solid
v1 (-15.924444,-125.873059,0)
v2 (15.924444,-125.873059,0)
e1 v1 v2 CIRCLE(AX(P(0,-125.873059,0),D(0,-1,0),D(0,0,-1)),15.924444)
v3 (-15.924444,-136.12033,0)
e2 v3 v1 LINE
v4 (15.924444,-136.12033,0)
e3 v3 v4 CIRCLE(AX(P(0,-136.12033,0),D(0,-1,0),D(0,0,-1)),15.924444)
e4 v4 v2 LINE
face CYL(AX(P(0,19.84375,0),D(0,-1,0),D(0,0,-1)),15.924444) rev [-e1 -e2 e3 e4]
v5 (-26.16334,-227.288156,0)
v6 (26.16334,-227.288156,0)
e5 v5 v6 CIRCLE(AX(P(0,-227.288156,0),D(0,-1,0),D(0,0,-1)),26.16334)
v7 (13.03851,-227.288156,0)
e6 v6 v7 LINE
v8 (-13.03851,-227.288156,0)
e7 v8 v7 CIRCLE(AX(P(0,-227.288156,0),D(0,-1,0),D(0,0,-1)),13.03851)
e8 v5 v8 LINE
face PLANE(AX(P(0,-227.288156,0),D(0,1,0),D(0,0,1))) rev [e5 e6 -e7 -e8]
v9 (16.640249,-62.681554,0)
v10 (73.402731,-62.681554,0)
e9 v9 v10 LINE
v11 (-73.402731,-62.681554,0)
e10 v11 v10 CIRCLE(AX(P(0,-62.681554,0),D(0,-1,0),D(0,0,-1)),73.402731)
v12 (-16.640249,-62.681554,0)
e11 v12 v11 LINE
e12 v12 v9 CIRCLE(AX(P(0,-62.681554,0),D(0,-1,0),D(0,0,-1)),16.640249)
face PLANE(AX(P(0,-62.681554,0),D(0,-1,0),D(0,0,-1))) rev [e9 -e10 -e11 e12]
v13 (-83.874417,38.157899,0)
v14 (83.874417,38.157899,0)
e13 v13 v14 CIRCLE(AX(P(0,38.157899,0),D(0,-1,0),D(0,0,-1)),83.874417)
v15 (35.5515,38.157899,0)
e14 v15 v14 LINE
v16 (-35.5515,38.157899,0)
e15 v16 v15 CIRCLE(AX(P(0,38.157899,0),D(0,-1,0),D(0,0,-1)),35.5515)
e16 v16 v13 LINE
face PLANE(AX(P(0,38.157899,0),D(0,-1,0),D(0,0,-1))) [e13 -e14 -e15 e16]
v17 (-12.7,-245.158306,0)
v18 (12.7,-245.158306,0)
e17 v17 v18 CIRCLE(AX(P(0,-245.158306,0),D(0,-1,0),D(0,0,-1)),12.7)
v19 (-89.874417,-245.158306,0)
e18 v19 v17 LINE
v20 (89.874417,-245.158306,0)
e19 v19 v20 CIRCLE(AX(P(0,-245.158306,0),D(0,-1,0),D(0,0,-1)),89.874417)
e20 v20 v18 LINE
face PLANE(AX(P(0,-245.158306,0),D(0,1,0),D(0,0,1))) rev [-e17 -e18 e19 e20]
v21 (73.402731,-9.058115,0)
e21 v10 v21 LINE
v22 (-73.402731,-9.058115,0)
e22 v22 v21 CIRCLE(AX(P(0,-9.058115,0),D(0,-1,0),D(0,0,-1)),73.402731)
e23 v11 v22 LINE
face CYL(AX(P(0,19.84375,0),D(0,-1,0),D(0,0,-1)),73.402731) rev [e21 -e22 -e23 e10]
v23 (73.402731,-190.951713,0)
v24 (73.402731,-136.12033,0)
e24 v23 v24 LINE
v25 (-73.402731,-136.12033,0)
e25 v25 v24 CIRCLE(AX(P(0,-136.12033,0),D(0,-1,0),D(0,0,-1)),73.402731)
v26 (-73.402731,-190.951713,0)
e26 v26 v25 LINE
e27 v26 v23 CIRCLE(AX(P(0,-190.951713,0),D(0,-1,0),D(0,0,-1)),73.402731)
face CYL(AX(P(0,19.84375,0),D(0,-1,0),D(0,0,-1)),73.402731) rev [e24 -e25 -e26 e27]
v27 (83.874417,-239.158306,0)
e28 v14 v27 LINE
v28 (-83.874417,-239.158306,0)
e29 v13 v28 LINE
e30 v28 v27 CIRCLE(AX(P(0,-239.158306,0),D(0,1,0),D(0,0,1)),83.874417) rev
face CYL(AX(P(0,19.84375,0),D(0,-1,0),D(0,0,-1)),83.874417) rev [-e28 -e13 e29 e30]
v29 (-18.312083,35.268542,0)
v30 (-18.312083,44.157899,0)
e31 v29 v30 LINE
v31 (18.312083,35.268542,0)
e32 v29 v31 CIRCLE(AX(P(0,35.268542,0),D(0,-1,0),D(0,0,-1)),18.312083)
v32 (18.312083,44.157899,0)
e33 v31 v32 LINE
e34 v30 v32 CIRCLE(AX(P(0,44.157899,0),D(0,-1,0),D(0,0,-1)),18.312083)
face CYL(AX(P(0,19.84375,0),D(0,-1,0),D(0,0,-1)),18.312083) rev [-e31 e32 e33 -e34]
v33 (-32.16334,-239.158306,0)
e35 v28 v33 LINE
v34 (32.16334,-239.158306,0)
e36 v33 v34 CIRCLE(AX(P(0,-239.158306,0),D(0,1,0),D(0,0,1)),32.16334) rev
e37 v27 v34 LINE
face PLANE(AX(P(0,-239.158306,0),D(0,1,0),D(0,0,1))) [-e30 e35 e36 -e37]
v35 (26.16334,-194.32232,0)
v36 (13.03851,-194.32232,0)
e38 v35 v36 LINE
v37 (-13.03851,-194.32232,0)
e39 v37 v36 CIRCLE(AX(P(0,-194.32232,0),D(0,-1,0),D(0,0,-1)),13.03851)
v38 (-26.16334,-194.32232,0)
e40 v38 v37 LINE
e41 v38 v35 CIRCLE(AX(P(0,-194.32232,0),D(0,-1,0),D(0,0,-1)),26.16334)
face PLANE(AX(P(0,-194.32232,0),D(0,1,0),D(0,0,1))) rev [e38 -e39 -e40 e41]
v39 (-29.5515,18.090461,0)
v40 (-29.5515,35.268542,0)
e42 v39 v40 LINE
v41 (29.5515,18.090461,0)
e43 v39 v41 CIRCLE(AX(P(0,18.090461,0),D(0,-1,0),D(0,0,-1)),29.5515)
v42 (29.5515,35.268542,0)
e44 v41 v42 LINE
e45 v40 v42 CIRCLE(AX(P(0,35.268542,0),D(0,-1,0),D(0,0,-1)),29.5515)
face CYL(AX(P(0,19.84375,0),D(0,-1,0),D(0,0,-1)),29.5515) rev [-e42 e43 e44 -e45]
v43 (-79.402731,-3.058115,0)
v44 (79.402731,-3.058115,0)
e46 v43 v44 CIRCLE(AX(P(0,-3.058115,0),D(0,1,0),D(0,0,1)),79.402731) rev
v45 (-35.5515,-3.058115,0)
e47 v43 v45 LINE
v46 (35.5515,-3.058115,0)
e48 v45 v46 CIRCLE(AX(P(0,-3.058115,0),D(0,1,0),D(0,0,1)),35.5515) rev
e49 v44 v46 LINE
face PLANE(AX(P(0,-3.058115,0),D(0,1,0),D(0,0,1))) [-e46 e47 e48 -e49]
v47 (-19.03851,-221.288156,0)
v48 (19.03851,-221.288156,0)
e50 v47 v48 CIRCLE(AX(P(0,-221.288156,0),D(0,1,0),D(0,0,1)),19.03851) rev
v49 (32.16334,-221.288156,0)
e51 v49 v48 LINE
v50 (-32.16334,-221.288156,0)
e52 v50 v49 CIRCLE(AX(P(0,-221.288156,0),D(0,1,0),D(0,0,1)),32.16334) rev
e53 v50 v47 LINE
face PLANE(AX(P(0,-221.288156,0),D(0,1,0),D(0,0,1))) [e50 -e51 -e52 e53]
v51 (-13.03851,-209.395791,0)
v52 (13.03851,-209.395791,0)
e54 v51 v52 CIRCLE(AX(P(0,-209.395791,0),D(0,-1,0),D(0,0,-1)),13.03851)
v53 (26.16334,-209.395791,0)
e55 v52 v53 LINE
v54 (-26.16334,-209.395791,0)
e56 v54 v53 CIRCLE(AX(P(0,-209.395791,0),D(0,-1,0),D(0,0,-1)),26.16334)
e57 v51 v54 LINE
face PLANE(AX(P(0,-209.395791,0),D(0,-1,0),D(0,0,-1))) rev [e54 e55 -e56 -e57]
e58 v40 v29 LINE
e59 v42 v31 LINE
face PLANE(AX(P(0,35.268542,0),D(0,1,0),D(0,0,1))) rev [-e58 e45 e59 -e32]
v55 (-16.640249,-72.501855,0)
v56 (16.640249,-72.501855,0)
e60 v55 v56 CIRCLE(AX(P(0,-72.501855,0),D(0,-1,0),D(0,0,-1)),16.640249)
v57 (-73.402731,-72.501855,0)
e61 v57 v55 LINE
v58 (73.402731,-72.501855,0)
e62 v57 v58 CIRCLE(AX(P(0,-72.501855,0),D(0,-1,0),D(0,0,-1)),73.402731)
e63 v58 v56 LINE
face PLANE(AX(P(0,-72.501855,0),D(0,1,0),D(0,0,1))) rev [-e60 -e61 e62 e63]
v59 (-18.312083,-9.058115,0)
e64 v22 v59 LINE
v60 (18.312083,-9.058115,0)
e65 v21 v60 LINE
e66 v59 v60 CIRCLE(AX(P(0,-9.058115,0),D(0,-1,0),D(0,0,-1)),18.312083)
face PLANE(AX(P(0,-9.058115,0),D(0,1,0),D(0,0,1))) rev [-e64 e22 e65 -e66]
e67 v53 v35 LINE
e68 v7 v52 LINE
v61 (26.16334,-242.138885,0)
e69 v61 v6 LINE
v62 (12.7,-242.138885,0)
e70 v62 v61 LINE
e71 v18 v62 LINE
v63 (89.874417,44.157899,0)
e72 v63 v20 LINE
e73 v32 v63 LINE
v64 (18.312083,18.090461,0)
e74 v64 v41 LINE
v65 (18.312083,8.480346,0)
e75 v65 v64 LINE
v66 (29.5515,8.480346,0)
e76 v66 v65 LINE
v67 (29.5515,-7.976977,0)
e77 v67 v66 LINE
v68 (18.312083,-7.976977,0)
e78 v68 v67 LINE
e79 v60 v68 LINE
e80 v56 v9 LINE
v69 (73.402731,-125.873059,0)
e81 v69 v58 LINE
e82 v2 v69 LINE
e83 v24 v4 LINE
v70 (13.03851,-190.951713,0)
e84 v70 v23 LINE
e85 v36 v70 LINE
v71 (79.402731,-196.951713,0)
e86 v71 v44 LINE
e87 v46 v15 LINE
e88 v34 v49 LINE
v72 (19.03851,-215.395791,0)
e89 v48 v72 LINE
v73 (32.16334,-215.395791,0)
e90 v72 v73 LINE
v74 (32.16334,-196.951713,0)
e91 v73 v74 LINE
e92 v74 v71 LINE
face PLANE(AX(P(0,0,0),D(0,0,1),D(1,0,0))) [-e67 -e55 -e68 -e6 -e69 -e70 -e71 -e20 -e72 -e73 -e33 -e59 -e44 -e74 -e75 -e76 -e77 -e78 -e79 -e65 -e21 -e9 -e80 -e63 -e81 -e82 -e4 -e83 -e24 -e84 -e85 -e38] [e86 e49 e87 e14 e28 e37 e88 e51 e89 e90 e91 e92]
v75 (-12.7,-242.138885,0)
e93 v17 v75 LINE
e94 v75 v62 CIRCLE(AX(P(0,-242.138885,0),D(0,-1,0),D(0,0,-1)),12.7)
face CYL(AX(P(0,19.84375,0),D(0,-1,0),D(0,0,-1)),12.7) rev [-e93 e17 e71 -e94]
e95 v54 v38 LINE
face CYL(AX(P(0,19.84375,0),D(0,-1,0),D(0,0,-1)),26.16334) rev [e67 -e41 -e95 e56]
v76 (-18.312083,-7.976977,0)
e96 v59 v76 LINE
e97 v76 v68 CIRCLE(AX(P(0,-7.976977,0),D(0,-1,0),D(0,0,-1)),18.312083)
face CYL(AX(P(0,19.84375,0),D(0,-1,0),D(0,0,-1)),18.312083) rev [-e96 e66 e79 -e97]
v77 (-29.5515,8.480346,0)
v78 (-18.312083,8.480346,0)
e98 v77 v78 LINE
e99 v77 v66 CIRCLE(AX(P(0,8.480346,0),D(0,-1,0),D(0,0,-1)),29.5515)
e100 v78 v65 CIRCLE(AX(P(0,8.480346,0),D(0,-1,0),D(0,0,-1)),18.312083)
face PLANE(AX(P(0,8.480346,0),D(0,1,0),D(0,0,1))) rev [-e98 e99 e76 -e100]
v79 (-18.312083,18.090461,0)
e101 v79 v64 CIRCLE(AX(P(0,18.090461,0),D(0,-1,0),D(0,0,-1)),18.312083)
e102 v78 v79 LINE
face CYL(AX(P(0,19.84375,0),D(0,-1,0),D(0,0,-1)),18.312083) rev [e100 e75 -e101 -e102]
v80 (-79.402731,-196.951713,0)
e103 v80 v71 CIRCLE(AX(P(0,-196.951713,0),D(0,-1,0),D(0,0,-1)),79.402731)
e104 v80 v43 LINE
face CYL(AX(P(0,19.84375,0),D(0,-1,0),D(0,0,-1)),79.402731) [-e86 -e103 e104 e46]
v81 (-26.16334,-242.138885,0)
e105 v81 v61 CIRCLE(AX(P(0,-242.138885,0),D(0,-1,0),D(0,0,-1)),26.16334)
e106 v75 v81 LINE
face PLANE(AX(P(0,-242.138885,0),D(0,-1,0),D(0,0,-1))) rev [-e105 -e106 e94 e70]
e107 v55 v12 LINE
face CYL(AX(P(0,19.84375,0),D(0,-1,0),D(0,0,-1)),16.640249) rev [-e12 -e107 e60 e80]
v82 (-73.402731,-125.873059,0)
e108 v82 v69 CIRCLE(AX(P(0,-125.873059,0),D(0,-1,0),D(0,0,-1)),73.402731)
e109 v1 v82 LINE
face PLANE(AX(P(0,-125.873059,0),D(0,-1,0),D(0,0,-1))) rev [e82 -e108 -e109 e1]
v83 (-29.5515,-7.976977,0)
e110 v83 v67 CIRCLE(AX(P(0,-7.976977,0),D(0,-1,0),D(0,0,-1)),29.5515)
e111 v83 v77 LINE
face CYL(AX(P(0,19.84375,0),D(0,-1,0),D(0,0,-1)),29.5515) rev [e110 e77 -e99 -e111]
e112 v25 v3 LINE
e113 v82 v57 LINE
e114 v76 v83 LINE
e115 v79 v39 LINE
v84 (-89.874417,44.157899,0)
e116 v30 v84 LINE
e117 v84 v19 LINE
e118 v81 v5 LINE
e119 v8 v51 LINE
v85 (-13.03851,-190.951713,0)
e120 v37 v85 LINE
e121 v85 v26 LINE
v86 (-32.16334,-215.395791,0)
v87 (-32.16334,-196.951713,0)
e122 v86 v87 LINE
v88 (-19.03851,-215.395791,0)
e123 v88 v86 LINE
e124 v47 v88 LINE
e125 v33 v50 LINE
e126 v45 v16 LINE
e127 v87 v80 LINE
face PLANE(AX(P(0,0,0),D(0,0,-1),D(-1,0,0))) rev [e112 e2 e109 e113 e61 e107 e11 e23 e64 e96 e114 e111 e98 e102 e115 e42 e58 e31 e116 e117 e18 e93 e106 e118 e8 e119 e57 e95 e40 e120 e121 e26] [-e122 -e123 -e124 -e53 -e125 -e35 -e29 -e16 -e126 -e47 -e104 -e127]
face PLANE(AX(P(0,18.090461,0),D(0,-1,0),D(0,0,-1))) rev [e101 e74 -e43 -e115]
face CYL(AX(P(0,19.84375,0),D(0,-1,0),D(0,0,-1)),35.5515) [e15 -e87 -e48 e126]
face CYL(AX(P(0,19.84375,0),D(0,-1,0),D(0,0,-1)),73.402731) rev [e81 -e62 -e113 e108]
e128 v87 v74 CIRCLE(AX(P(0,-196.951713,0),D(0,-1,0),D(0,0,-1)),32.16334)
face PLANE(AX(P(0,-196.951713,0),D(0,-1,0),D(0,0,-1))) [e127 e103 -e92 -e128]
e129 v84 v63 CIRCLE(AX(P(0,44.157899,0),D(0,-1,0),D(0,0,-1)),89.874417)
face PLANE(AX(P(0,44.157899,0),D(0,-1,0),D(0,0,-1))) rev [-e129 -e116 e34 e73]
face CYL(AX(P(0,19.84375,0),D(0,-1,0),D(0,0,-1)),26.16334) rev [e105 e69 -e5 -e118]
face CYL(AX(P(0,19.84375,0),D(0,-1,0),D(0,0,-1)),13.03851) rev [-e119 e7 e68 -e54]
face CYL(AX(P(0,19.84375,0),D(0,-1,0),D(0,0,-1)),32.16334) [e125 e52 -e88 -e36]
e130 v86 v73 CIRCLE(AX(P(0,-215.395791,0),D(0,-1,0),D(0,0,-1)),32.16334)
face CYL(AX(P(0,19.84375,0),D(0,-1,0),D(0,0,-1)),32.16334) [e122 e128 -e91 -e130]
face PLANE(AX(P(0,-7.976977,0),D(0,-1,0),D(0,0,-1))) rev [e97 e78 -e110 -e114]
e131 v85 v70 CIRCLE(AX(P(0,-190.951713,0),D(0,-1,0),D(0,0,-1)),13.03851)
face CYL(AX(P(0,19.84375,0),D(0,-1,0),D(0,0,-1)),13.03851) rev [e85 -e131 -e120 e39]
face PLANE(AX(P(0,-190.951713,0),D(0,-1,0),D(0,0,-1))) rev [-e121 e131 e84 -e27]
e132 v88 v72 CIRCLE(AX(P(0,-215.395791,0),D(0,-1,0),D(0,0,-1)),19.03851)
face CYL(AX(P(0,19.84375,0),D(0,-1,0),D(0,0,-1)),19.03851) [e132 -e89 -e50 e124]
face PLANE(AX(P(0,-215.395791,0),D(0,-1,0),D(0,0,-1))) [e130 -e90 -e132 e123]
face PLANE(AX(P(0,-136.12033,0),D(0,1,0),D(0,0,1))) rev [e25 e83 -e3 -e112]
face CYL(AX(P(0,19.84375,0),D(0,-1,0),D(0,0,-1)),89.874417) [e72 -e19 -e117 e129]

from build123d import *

# Parameters (mm, degrees)
REVOLVE1_ANGLE = 180
SHELL1_START   = -239.158306138
SHELL1_DEPTH   = 42.206593174
SHELL1_START_2 = -3.058115052
SHELL1_2_DEPTH = 41.216014124
SHELL1_START_3 = -196.951712964
SHELL1_3_DEPTH = 193.893597912
SHELL1_START_4 = -221.288155922
SHELL1_4_DEPTH = 5.892364499


# Read off the part's stored shape, not the designer's step: Shell1
with BuildPart() as part:
    # Sketch1 → Revolve1 (revolve)
    with BuildSketch(Plane.XY):
        Polygon((89.874416534, -245.158306138), (12.7, -245.158306138), (12.7, -242.138884915), (26.163339875, -242.138884915), (26.163339875, -227.288155922), (13.03850974, -227.288155922), (13.03850974, -209.395791423), (26.163339875, -209.395791423), (26.163339875, -194.322320246), (13.03850974, -194.322320246), (13.03850974, -190.951712964), (73.402730944, -190.951712964), (73.402730944, -136.120329582), (15.924443856, -136.120329582), (15.924443856, -125.873058549), (73.402730944, -125.873058549), (73.402730944, -72.501855253), (16.640249143, -72.501855253), (16.640249143, -62.681553847), (73.402730944, -62.681553847), (73.402730944, -9.058115052), (18.31208302, -9.058115052), (18.31208302, -7.976977068), (29.551500324, -7.976977068), (29.551500324, 8.480345585), (18.31208302, 8.480345585), (18.31208302, 18.090461002), (29.551500324, 18.090461002), (29.551500324, 35.26854231), (18.31208302, 35.26854231), (18.31208302, 44.157899072), (89.874416534, 44.157899072), align=None)
    revolve(axis=Axis((0, 19.84375, 0), (0, 1, 0)), revolution_arc=REVOLVE1_ANGLE)

    # Shell1 outline → Shell1 (cut)
    with BuildSketch(Plane(origin=(0, 0, 0), x_dir=(1, 0, 0), z_dir=(0, 1, 0)).offset(SHELL1_START)):
        with BuildLine():
            ThreePointArc((83.874416534, 0), (0, 83.874416534), (-83.874416534, 0))
            Line((-83.874416534, 0), (-32.163339875, 0))
            ThreePointArc((-32.163339875, 0), (0, 32.163339875), (32.163339875, 0))
            Line((32.163339875, 0), (83.874416534, 0))
        make_face()
    extrude(amount=SHELL1_DEPTH, mode=Mode.SUBTRACT)

    # Shell1 2 outline → Shell1 2 (cut)
    with BuildSketch(Plane(origin=(0, 0, 0), x_dir=(1, 0, 0), z_dir=(0, 1, 0)).offset(SHELL1_START_2)):
        with BuildLine():
            ThreePointArc((83.874416534, 0), (0, 83.874416534), (-83.874416534, 0))
            Line((-83.874416534, 0), (-35.551500324, 0))
            ThreePointArc((-35.551500324, 0), (0, 35.551500324), (35.551500324, 0))
            Line((35.551500324, 0), (83.874416534, 0))
        make_face()
    extrude(amount=SHELL1_2_DEPTH, mode=Mode.SUBTRACT)

    # Shell1 3 outline → Shell1 3 (cut)
    with BuildSketch(Plane(origin=(0, 0, 0), x_dir=(1, 0, 0), z_dir=(0, 1, 0)).offset(SHELL1_START_3)):
        with BuildLine():
            ThreePointArc((83.874416534, 0), (0, 83.874416534), (-83.874416534, 0))
            Line((-83.874416534, 0), (-79.402730944, 0))
            ThreePointArc((-79.402730944, 0), (0, 79.402730944), (79.402730944, 0))
            Line((79.402730944, 0), (83.874416534, 0))
        make_face()
    extrude(amount=SHELL1_3_DEPTH, mode=Mode.SUBTRACT)

    # Shell1 4 outline → Shell1 4 (cut)
    with BuildSketch(Plane(origin=(0, 0, 0), x_dir=(1, 0, 0), z_dir=(0, 1, 0)).offset(SHELL1_START_4)):
        with BuildLine():
            ThreePointArc((32.163339875, 0), (0, 32.163339875), (-32.163339875, 0))
            Line((-32.163339875, 0), (-19.03850974, 0))
            ThreePointArc((-19.03850974, 0), (0, 19.03850974), (19.03850974, 0))
            Line((19.03850974, 0), (32.163339875, 0))
        make_face()
    extrude(amount=SHELL1_4_DEPTH, mode=Mode.SUBTRACT)


solid = part.part
